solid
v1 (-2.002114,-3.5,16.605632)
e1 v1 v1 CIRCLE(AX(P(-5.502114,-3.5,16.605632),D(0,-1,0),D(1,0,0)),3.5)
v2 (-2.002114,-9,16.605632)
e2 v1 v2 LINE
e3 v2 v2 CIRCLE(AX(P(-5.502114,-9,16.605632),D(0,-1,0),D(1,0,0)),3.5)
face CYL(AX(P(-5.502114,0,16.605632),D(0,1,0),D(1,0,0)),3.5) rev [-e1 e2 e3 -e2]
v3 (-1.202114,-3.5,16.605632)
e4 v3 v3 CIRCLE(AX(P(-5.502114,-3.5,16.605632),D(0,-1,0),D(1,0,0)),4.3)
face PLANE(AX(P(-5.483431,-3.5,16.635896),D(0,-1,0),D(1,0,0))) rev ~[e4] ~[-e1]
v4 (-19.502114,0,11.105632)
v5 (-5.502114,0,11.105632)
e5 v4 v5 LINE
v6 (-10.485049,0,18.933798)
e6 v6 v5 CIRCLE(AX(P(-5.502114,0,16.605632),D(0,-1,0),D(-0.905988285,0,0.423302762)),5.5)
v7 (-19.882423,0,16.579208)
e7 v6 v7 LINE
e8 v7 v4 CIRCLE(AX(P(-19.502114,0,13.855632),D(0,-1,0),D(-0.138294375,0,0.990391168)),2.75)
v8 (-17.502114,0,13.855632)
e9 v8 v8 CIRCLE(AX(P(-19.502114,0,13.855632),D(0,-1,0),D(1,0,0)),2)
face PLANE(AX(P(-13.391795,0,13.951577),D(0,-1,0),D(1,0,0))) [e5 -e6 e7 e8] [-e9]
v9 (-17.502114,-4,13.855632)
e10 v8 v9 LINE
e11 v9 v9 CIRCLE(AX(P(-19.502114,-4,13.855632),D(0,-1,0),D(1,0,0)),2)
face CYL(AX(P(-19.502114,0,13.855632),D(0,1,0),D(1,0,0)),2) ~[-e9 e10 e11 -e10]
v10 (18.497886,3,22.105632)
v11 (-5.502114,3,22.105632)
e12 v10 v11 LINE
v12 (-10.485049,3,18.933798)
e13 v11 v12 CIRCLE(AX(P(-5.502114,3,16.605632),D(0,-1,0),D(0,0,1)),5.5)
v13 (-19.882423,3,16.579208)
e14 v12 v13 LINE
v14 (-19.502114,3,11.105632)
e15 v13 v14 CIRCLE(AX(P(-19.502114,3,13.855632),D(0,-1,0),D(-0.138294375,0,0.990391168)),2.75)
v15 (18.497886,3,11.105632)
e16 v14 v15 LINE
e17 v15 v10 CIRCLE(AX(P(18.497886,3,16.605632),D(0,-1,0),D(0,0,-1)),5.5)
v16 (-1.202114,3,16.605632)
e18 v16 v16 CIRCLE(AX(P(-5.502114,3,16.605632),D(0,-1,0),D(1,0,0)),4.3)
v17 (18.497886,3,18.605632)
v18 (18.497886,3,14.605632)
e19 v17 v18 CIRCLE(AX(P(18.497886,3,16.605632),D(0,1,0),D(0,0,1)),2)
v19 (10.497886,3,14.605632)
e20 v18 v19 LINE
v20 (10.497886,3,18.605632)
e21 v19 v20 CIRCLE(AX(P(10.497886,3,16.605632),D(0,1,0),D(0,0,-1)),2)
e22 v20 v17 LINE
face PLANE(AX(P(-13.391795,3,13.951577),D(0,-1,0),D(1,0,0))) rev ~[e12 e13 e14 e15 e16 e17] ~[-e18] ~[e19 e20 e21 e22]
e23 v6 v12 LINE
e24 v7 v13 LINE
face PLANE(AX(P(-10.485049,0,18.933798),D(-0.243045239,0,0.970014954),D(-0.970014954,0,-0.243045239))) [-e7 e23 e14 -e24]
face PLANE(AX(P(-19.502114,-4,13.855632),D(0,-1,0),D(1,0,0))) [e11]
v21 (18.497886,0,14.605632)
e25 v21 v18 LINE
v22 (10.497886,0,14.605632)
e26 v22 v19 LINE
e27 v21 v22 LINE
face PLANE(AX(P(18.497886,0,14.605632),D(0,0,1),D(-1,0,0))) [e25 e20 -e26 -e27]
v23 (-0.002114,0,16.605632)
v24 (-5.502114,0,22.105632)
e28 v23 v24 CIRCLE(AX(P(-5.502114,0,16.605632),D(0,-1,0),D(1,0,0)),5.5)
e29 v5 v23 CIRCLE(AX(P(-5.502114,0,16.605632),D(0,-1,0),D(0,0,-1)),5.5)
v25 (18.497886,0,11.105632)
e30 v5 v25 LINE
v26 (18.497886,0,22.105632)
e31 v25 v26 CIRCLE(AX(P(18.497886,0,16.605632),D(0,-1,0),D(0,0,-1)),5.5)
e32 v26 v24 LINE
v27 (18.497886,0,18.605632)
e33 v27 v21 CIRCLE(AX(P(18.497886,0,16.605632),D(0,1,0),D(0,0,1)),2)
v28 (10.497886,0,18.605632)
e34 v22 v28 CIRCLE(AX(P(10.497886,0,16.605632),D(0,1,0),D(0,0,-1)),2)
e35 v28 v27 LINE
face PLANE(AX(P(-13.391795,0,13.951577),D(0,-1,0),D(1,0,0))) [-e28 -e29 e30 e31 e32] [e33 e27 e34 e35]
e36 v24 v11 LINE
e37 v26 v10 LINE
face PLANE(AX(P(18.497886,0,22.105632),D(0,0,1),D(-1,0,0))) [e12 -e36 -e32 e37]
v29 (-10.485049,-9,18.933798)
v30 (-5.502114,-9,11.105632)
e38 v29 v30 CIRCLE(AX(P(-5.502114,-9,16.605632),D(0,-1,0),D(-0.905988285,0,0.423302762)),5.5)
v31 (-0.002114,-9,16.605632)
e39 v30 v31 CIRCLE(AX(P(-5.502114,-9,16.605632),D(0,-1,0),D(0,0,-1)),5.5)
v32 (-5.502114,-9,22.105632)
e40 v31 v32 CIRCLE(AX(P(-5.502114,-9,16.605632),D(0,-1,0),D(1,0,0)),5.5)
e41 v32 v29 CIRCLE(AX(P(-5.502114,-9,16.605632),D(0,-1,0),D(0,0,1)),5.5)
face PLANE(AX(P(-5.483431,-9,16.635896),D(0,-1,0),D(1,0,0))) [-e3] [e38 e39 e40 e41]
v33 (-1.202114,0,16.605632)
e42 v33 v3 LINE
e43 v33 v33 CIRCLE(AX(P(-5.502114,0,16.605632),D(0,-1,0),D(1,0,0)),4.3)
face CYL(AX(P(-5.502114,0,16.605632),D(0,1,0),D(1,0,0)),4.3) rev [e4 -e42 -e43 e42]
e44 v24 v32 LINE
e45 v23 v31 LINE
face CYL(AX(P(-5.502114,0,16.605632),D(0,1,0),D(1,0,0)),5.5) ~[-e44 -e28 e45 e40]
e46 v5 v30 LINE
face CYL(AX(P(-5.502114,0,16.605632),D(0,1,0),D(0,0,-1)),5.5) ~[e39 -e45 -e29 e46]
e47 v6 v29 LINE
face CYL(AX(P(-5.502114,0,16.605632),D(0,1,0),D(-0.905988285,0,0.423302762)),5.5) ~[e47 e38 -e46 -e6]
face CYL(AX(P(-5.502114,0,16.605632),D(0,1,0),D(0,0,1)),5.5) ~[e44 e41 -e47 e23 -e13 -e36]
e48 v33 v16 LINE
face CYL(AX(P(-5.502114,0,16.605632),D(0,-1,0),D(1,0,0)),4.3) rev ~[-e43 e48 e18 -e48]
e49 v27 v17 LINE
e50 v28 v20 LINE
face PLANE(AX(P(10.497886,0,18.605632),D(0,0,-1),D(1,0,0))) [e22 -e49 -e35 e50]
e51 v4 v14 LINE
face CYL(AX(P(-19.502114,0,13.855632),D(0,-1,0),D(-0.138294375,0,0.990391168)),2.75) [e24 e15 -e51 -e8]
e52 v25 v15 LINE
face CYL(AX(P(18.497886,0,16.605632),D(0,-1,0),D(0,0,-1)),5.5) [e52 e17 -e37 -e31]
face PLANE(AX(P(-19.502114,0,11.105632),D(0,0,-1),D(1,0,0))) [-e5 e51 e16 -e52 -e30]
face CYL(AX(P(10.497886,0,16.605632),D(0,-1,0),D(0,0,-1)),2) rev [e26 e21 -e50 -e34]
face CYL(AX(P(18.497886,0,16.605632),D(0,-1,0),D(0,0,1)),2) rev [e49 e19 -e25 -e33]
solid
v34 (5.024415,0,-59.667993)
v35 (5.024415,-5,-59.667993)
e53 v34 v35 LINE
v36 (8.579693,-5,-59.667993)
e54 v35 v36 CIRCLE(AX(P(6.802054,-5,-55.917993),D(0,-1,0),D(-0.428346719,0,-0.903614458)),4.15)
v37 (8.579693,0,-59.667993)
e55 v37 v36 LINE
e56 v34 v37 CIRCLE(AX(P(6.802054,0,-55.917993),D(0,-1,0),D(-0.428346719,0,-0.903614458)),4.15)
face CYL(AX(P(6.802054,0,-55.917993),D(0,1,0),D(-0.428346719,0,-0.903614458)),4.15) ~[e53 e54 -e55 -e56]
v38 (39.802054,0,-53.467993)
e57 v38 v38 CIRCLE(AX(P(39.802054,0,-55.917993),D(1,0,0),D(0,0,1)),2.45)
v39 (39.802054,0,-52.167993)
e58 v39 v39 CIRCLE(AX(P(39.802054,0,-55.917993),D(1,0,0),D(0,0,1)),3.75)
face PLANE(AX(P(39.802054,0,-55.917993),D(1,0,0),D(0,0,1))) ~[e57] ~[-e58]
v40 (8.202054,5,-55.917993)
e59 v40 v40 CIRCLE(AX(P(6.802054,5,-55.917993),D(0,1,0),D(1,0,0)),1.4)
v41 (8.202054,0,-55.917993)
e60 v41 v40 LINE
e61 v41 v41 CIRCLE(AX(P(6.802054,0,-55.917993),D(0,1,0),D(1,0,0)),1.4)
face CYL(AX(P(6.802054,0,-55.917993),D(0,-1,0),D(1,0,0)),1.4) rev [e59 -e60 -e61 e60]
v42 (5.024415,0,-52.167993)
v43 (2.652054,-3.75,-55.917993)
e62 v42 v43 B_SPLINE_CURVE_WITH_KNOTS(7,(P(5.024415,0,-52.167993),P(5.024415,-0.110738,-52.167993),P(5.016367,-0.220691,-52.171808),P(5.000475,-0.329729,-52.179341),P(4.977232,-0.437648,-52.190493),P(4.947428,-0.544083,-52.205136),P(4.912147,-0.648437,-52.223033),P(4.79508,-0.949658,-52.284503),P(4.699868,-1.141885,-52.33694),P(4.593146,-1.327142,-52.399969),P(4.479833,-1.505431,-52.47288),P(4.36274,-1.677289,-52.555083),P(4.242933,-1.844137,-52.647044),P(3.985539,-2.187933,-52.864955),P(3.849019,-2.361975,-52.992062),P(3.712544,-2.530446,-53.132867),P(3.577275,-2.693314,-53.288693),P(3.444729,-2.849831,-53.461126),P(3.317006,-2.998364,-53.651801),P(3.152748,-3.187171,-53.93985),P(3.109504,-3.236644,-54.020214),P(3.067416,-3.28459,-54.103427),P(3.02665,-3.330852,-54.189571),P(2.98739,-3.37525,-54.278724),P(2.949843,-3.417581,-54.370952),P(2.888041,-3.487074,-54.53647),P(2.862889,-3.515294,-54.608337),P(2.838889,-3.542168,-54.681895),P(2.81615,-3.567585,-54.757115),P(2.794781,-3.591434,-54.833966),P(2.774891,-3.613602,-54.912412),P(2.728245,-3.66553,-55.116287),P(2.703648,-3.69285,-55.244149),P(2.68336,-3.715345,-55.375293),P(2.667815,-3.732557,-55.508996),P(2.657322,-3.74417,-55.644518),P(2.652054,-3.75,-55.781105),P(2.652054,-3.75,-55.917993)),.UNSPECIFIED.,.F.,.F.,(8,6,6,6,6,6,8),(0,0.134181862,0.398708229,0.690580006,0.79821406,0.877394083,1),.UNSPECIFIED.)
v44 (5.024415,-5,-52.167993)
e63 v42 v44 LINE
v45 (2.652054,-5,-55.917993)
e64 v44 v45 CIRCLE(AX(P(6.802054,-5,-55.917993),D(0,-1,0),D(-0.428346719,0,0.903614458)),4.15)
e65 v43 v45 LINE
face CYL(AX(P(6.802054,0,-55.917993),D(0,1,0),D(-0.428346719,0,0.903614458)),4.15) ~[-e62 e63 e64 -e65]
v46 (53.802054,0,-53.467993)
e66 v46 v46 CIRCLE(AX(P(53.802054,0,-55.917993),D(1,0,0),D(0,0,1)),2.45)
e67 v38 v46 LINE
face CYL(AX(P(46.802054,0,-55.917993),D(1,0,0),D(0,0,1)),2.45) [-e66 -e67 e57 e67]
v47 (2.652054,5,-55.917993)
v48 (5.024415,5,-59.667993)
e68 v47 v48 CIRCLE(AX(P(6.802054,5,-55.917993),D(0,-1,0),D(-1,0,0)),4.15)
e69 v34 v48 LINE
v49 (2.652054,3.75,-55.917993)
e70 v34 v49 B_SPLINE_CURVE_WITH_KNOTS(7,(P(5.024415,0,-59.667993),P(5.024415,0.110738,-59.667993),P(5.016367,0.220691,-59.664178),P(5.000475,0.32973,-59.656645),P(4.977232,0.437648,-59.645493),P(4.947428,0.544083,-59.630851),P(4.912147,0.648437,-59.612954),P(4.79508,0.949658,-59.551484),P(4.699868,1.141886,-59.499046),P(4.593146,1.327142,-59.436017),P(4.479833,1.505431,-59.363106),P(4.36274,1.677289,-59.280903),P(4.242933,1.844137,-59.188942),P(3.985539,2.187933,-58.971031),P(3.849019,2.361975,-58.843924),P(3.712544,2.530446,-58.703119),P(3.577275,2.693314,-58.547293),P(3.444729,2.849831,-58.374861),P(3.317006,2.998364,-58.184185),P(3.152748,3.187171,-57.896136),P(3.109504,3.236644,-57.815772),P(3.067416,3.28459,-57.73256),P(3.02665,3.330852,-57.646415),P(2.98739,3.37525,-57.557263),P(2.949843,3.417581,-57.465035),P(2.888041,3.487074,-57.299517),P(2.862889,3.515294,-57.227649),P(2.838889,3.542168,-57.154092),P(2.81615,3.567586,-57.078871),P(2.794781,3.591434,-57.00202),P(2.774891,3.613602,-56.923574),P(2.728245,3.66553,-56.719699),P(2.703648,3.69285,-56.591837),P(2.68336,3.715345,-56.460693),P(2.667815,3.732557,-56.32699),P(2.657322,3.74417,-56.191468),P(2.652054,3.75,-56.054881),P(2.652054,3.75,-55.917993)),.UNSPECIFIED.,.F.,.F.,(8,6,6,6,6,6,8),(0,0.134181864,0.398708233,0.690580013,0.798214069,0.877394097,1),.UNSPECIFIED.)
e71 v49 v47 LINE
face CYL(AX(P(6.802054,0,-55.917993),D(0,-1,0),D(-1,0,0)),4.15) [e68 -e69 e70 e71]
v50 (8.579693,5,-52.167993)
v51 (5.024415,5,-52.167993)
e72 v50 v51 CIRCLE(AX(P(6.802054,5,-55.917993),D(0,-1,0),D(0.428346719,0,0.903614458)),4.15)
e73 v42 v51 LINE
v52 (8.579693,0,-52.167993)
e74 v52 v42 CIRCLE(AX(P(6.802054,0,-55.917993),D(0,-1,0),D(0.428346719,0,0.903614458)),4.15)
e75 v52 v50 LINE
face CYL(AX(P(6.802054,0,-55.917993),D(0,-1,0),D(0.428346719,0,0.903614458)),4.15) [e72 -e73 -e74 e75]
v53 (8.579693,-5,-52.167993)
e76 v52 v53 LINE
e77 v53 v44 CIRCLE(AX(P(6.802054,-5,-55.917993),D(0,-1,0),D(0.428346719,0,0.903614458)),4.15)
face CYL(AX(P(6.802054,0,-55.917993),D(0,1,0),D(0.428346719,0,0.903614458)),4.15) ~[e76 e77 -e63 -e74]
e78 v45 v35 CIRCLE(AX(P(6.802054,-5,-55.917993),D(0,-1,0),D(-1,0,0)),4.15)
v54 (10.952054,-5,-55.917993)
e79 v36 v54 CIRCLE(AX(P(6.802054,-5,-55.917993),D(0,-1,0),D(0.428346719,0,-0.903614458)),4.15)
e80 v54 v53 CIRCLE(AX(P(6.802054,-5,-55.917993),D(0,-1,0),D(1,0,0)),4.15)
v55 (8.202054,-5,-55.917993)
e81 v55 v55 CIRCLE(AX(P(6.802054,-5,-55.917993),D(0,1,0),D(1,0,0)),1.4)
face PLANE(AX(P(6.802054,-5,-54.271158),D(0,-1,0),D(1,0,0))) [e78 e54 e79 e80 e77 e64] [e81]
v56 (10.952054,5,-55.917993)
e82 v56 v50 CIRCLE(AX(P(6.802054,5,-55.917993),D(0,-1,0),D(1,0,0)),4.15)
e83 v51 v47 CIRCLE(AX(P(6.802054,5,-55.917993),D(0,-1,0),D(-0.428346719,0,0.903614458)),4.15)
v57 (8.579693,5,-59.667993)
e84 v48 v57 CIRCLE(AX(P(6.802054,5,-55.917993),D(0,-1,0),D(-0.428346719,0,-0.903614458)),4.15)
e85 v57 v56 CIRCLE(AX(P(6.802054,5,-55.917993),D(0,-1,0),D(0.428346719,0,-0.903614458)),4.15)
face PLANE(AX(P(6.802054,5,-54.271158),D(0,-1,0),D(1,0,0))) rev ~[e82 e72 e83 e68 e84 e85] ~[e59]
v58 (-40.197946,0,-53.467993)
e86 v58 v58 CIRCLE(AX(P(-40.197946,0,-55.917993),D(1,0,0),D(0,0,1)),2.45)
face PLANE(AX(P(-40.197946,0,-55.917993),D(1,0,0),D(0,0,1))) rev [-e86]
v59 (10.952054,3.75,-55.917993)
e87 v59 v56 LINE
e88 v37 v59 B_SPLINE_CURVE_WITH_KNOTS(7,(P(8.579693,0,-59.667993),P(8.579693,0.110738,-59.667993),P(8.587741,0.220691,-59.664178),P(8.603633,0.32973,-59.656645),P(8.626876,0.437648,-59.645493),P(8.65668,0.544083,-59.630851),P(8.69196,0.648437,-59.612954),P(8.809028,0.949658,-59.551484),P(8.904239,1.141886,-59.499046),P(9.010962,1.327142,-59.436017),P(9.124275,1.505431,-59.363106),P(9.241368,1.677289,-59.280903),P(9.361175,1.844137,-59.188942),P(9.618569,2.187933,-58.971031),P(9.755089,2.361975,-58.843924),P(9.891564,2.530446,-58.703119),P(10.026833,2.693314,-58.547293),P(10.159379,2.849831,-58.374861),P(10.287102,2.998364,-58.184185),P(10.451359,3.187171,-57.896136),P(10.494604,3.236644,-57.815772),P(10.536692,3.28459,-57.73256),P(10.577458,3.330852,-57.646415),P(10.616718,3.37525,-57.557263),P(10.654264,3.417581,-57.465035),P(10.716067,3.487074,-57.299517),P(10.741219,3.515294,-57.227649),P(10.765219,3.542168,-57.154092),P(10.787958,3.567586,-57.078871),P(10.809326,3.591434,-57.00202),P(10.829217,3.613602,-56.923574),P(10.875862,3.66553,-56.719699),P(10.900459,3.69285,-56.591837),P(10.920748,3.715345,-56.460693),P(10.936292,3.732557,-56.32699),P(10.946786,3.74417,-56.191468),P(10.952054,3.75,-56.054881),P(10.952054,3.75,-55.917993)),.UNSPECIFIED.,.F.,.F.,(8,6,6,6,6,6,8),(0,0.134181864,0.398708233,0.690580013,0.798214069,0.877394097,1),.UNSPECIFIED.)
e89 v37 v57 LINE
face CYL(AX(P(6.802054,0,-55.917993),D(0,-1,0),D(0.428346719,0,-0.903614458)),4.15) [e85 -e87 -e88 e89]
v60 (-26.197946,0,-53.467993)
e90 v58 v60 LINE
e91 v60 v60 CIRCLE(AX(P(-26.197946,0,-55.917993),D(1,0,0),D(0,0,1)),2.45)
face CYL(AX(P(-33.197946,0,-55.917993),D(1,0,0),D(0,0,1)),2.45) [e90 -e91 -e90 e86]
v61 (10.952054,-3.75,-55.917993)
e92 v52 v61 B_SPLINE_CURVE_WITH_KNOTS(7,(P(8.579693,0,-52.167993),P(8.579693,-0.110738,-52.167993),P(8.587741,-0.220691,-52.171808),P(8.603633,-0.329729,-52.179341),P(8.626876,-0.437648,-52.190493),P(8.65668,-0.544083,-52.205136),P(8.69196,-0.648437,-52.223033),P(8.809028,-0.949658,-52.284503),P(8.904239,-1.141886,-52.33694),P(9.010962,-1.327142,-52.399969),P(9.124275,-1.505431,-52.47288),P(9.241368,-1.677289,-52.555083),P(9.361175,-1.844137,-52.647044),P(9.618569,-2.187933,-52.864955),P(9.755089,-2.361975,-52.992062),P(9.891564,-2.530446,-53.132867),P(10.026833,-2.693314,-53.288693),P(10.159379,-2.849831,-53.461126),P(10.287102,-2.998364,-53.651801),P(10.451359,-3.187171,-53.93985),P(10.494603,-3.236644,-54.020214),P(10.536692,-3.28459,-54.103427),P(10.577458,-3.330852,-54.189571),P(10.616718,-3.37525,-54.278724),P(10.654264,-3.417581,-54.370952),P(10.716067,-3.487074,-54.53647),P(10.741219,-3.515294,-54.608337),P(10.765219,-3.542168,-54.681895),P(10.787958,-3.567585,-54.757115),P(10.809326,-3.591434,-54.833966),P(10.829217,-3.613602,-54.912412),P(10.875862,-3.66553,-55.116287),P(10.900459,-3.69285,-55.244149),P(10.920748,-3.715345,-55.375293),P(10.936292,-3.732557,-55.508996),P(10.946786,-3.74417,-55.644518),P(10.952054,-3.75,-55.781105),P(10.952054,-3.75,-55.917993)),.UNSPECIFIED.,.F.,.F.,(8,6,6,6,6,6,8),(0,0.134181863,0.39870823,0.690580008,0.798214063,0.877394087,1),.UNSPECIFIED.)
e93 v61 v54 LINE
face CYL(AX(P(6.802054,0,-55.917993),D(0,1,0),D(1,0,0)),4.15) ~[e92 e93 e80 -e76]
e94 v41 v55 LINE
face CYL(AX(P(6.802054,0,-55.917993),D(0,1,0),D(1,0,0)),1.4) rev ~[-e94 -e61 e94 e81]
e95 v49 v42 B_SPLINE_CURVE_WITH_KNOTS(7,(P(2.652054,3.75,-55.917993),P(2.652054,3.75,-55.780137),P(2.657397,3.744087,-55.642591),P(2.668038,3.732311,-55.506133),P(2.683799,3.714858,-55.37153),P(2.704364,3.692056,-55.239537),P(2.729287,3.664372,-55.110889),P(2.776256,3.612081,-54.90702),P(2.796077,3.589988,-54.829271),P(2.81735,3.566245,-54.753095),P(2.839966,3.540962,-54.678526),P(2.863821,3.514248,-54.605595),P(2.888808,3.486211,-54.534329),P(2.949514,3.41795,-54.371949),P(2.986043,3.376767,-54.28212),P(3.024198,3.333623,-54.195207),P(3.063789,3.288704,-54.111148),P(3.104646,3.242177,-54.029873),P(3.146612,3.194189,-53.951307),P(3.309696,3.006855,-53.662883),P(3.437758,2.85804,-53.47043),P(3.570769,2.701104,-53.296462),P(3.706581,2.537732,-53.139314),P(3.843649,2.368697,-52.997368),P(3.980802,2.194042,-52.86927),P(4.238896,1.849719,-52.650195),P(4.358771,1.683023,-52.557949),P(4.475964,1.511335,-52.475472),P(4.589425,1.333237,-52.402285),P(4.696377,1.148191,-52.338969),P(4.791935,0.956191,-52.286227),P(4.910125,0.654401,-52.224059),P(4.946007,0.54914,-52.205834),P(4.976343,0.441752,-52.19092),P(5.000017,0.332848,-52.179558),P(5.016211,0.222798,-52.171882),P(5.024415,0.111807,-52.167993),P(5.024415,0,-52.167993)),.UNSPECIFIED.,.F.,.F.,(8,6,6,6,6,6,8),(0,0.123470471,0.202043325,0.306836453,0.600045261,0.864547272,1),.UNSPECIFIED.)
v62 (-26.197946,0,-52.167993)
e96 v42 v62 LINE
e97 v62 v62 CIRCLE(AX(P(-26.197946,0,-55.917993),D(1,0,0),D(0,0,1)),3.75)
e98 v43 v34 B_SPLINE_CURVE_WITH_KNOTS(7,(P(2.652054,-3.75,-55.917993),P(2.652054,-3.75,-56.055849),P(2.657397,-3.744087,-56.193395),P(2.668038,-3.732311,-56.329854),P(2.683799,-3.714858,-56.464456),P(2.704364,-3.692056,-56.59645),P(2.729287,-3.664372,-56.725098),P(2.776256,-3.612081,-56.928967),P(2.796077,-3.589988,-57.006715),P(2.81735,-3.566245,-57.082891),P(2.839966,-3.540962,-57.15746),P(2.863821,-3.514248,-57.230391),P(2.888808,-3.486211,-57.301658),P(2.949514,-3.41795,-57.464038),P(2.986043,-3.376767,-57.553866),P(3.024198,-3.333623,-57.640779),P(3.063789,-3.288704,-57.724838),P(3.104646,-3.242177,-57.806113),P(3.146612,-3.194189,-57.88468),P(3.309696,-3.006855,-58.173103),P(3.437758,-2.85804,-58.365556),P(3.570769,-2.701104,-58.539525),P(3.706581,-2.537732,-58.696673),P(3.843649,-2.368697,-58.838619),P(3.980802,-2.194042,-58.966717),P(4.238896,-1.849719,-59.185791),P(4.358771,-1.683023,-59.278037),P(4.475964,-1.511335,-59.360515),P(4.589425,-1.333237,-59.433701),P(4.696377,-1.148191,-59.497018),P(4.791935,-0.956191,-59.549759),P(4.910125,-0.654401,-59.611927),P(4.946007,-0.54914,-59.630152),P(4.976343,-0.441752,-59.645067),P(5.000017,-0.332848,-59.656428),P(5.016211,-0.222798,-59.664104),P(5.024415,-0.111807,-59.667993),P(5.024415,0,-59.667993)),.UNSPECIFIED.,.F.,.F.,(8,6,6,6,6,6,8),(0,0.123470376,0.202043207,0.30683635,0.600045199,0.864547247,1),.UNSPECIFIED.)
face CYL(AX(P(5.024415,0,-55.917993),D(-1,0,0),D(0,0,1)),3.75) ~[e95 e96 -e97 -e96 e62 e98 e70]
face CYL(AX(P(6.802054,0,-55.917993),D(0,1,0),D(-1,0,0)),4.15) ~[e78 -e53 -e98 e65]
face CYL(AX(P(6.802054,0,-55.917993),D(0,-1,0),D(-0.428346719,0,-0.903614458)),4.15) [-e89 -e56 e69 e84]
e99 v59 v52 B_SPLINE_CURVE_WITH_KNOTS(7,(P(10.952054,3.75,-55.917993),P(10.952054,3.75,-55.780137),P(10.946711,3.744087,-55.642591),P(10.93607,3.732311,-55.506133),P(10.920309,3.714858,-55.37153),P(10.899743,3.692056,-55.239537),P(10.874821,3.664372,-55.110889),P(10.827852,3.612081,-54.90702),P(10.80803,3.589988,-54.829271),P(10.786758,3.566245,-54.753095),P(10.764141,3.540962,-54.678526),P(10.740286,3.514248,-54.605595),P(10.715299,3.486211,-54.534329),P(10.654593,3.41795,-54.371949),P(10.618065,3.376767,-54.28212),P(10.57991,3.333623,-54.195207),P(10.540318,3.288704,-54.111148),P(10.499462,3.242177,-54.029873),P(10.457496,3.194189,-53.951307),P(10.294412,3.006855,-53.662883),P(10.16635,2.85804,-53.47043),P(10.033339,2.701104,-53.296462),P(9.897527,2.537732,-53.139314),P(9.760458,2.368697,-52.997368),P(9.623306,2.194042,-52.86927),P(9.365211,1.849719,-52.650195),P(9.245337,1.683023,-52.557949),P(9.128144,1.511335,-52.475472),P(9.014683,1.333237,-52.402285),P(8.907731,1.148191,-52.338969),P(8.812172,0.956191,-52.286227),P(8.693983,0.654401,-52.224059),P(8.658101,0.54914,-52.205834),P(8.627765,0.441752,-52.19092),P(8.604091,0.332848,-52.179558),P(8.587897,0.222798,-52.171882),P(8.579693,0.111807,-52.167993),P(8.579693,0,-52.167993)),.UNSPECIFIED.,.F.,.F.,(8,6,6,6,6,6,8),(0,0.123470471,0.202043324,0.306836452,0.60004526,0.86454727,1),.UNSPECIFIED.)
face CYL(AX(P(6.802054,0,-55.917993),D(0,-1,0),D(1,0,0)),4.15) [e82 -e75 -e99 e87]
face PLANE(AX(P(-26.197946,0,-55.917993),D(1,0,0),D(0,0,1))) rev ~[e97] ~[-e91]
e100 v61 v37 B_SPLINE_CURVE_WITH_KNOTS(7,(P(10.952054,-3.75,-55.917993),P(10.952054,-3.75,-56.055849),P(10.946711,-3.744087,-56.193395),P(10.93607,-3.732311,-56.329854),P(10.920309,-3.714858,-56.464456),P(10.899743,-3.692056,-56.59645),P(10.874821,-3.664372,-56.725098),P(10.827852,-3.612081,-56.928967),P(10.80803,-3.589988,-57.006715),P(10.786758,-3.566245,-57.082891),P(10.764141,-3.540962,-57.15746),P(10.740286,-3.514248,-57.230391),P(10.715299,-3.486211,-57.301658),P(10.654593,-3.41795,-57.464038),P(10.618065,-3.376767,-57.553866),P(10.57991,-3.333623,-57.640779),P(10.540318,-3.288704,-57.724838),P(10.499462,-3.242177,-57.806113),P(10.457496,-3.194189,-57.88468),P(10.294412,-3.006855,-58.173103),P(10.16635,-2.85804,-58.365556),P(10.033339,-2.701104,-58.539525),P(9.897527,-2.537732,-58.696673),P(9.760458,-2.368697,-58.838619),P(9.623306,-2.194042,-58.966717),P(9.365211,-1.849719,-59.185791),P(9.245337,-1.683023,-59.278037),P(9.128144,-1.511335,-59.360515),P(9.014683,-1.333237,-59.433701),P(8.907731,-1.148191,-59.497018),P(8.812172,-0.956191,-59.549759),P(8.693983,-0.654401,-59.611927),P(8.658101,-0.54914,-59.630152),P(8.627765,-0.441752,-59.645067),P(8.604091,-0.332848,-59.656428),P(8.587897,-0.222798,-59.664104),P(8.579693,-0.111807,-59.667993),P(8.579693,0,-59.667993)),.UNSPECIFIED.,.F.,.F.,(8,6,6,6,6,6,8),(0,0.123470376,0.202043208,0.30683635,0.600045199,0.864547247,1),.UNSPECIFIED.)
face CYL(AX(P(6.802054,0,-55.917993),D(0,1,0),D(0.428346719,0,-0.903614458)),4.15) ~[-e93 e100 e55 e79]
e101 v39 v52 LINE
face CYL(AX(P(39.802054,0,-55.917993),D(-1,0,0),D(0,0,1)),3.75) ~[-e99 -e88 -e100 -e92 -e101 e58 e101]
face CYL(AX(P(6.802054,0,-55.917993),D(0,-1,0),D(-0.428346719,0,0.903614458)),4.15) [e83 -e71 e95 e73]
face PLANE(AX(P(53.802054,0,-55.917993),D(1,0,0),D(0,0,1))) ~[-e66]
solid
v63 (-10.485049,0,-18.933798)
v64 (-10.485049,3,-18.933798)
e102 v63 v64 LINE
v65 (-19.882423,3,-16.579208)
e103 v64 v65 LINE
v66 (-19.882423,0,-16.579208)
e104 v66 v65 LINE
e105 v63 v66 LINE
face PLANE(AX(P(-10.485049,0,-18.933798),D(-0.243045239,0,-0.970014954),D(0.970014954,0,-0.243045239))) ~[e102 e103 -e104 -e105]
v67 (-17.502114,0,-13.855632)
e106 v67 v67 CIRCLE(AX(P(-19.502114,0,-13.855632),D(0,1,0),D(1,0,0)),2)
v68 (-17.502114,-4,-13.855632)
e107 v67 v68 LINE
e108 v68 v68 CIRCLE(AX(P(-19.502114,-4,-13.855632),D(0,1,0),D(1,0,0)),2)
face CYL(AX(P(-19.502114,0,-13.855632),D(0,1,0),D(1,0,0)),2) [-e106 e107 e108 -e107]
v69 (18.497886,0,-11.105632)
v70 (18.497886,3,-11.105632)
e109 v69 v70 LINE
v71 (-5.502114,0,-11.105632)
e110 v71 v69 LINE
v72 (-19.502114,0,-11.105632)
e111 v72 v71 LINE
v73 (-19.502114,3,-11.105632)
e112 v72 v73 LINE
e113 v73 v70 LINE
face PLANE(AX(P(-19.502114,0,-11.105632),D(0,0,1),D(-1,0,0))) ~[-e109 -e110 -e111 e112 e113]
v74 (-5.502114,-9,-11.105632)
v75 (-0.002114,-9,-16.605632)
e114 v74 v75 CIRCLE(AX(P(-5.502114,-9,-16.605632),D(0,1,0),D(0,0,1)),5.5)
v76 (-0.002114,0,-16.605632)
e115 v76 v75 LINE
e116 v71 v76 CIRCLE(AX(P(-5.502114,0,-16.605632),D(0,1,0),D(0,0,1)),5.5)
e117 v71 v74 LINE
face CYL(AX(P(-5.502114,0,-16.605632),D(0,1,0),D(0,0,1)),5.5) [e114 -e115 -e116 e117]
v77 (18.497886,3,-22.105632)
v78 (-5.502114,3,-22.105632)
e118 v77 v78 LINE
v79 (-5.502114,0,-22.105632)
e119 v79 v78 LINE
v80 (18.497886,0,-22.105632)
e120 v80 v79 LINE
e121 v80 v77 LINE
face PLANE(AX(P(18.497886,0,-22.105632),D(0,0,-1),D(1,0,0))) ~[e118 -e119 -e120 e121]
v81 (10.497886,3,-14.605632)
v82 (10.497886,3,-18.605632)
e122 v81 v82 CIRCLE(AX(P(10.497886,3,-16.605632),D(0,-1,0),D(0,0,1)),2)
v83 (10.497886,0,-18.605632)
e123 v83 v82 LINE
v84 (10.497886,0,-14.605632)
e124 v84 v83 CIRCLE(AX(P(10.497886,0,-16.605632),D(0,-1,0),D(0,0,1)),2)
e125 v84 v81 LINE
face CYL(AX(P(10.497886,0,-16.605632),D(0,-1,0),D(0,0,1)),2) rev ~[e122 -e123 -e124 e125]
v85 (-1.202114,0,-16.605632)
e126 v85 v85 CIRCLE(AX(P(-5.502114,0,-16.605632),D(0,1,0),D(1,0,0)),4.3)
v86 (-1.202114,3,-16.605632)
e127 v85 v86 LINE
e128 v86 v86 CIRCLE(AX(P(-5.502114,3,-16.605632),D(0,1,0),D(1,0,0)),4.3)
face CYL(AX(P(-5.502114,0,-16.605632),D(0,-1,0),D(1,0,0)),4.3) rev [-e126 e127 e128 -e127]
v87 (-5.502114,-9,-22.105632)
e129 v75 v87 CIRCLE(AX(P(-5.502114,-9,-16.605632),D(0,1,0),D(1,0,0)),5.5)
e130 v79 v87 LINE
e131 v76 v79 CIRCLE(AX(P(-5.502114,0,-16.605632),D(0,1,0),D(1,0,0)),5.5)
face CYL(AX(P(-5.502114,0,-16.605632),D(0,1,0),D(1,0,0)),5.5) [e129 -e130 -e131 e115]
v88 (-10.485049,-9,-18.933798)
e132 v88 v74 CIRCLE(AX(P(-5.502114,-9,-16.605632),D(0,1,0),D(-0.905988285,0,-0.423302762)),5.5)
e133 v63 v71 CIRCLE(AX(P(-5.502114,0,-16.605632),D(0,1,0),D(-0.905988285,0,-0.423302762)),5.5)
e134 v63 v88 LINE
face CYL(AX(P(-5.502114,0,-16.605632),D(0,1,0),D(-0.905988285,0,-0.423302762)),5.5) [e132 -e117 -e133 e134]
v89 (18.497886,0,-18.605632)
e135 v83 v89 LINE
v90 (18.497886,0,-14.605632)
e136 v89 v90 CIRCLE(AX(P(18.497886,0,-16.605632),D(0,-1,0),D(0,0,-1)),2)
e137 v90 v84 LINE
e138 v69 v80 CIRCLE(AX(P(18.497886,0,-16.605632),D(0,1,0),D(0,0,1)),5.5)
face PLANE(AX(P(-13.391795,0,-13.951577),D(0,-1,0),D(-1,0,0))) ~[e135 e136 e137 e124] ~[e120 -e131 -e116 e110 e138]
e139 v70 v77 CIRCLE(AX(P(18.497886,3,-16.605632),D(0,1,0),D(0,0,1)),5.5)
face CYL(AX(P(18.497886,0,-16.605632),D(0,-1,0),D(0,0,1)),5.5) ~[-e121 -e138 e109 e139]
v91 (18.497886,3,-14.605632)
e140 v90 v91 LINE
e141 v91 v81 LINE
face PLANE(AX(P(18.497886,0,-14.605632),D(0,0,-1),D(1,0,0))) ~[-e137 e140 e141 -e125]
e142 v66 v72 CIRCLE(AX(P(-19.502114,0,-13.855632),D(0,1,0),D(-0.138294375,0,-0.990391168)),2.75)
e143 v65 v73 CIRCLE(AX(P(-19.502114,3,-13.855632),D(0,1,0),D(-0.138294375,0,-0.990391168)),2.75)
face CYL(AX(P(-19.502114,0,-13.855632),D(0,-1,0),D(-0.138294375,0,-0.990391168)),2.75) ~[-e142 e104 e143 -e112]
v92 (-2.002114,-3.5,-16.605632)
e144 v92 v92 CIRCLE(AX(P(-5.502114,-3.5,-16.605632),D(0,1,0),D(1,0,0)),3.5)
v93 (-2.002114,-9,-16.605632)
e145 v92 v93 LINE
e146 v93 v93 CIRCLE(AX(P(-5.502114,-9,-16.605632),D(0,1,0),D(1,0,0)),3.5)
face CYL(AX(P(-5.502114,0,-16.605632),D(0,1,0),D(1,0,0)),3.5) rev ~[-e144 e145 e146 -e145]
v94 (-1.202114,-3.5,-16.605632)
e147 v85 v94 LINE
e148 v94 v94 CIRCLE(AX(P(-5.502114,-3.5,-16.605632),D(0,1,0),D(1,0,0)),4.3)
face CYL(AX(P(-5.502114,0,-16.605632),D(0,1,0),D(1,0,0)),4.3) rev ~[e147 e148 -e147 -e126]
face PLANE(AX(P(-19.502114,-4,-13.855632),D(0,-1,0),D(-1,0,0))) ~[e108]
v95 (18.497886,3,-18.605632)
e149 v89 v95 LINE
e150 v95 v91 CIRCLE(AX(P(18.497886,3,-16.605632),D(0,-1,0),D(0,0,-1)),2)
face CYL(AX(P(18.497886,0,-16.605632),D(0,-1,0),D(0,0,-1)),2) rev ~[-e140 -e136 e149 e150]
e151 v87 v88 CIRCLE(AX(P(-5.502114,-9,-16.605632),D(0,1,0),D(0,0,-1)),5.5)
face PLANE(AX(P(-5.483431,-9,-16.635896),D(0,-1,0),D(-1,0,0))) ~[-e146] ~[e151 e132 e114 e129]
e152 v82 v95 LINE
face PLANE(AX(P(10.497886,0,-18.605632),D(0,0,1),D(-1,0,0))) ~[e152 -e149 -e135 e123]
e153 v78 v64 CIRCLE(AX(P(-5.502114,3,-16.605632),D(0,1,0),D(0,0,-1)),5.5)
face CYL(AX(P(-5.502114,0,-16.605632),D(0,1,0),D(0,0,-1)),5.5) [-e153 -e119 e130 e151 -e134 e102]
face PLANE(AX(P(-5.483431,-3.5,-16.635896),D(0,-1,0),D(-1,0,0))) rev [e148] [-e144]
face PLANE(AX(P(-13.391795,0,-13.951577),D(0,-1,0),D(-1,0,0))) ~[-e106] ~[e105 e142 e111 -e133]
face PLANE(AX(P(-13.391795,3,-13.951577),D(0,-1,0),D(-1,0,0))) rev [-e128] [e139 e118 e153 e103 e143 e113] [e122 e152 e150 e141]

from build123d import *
from build123d import SkipClean  # not in build123d's __all__

# Parameters (mm, degrees)
F0_R     = 4.3
F0_R_2   = 2
F1_DEPTH = 3
F2_DEPTH = 4
F0_R_3   = 3.5
F3_DEPTH = 9
F4_DEPTH = 3.5
F7_DEPTH = 5
F8_DEPTH = 5
F6_W     = 14
F6_H     = 2.45


# Not quite as in the source:
# - after a boolean that leaves OpenCascade's solid faulty, fix() repairs it


with BuildPart() as f1:
    # F0 (on Front) → F1 (new body)
    with BuildSketch(Plane.XZ):
        with BuildLine():
            ThreePointArc((-5.5021138936, 11.1056324095), (-10.1418826672, 13.6522367828), (-10.4850494589, 18.9337975995))
            Line((-10.4850494589, 18.9337975995), (-19.8824234241, 16.5792081218))
            ThreePointArc((-19.8824234241, 16.5792081218), (-17.6970309604, 15.9302831281), (-16.7521138936, 13.8556324095))
            ThreePointArc((-16.7521138936, 13.8556324095), (-17.5575702454, 11.9110887612), (-19.5021138936, 11.1056324095))
            Line((-19.5021138936, 11.1056324095), (-5.5021138936, 11.1056324095))
        make_face()
        with BuildLine():
            ThreePointArc((-0.0021138936, 16.6056324095), (-1.6130265971, 20.494719706), (-5.5021138936, 22.1056324095))
            ThreePointArc((-5.5021138936, 22.1056324095), (-8.4555095203, 21.2454011831), (-10.4850494589, 18.9337975995))
            ThreePointArc((-10.4850494589, 18.9337975995), (-10.1418826672, 13.6522367828), (-5.5021138936, 11.1056324095))
            ThreePointArc((-5.5021138936, 11.1056324095), (-1.6130265971, 12.7165451129), (-0.0021138936, 16.6056324095))
        make_face()
        with Locations((-5.5021138936, 16.6056324095)):
            Circle(F0_R, mode=Mode.SUBTRACT)
        with BuildLine():
            Line((18.4978861064, 22.1056324095), (-5.5021138936, 22.1056324095))
            ThreePointArc((-5.5021138936, 22.1056324095), (-1.6130265971, 20.494719706), (-0.0021138936, 16.6056324095))
            ThreePointArc((-0.0021138936, 16.6056324095), (-1.6130265971, 12.7165451129), (-5.5021138936, 11.1056324095))
            Line((-5.5021138936, 11.1056324095), (18.4978861064, 11.1056324095))
            ThreePointArc((18.4978861064, 11.1056324095), (23.9978861064, 16.6056324095), (18.4978861064, 22.1056324095))
        make_face()
        with BuildLine():
            ThreePointArc((18.4978861064, 18.6056324095), (20.4978861064, 16.6056324095), (18.4978861064, 14.6056324095))
            Line((18.4978861064, 14.6056324095), (10.4978861064, 14.6056324095))
            ThreePointArc((10.4978861064, 14.6056324095), (8.4978861064, 16.6056324095), (10.4978861064, 18.6056324095))
            Line((10.4978861064, 18.6056324095), (18.4978861064, 18.6056324095))
        make_face(mode=Mode.SUBTRACT)
        with BuildLine():
            ThreePointArc((-16.7521138936, 13.8556324095), (-17.6970309604, 15.9302831281), (-19.8824234241, 16.5792081218))
            ThreePointArc((-19.8824234241, 16.5792081218), (-22.245499868, 13.6650192004), (-19.5021138936, 11.1056324095))
            ThreePointArc((-19.5021138936, 11.1056324095), (-17.5575702454, 11.9110887612), (-16.7521138936, 13.8556324095))
        make_face()
        with Locations((-19.5021138936, 13.8556324095)):
            Circle(F0_R_2, mode=Mode.SUBTRACT)
        with Locations((-19.5021138936, 13.8556324095)):
            Circle(F0_R_2)
    extrude(amount=-F1_DEPTH)

    # F0 (on Front) → F2 (join)
    with BuildSketch(Plane.XZ):
        with Locations((-19.5021138936, 13.8556324095)):
            Circle(F0_R_2)
    extrude(amount=F2_DEPTH)

    # F0 (on Front) → F3 (join)
    with BuildSketch(Plane.XZ):
        with BuildLine():
            ThreePointArc((-0.0021138936, 16.6056324095), (-1.6130265971, 20.494719706), (-5.5021138936, 22.1056324095))
            ThreePointArc((-5.5021138936, 22.1056324095), (-8.4555095203, 21.2454011831), (-10.4850494589, 18.9337975995))
            ThreePointArc((-10.4850494589, 18.9337975995), (-10.1418826672, 13.6522367828), (-5.5021138936, 11.1056324095))
            ThreePointArc((-5.5021138936, 11.1056324095), (-1.6130265971, 12.7165451129), (-0.0021138936, 16.6056324095))
        make_face()
        with Locations((-5.5021138936, 16.6056324095)):
            Circle(F0_R, mode=Mode.SUBTRACT)
        with Locations((-5.5021138936, 16.6056324095)):
            Circle(F0_R)
        with Locations((-5.5021138936, 16.6056324095)):
            Circle(F0_R_3, mode=Mode.SUBTRACT)
    with SkipClean():  # cleaning this boolean's faces spoils the solid; the shape is the same uncleaned
        extrude(amount=F3_DEPTH)

    # F4 (cut): a face of the model
    f4_faces = [f1.faces().sort_by_distance(p)[0] for p in [
        (-9.6804915273, 0, 16.6056324095),
    ]]
    extrude(f4_faces, amount=-F4_DEPTH, mode=Mode.SUBTRACT)

    add(f1.part.fix(), mode=Mode.REPLACE)


with BuildPart() as f5_1:
    # F5: instance of F1
    add(f1.part.mirror(Plane.XY), clean=False)


with BuildPart() as f7:
    # F6 (on Front) → F7 (new body)
    with BuildSketch(Plane.XZ):
        with BuildLine():
            Line((8.2020538688, -55.9179931879), (10.9520538688, -55.9179931879))
            ThreePointArc((10.9520538688, -55.9179931879), (10.3091681645, -53.6992887649), (8.5796927522, -52.1679931879))
            ThreePointArc((8.5796927522, -52.1679931879), (6.8020538688, -51.7679931879), (5.0244149853, -52.1679931879))
            ThreePointArc((5.0244149853, -52.1679931879), (3.2949395731, -53.6992887649), (2.6520538688, -55.9179931879))
            Line((2.6520538688, -55.9179931879), (5.4020538688, -55.9179931879))
            ThreePointArc((5.4020538688, -55.9179931879), (6.8020538688, -54.5179931879), (8.2020538688, -55.9179931879))
        make_face()
        with BuildLine():
            ThreePointArc((8.5796927522, -59.6679931879), (10.3091681645, -58.1366976109), (10.9520538688, -55.9179931879))
            Line((10.9520538688, -55.9179931879), (8.2020538688, -55.9179931879))
            ThreePointArc((8.2020538688, -55.9179931879), (6.8020538688, -57.3179931879), (5.4020538688, -55.9179931879))
            Line((5.4020538688, -55.9179931879), (2.6520538688, -55.9179931879))
            ThreePointArc((2.6520538688, -55.9179931879), (3.2949395731, -58.1366976109), (5.0244149853, -59.6679931879))
            ThreePointArc((5.0244149853, -59.6679931879), (6.8020538688, -60.0679931879), (8.5796927522, -59.6679931879))
        make_face()
    extrude(amount=F7_DEPTH)

    # F6 (on Front) → F8 (join)
    with BuildSketch(Plane.XZ):
        with BuildLine():
            Line((8.2020538688, -55.9179931879), (10.9520538688, -55.9179931879))
            ThreePointArc((10.9520538688, -55.9179931879), (10.3091681645, -53.6992887649), (8.5796927522, -52.1679931879))
            ThreePointArc((8.5796927522, -52.1679931879), (6.8020538688, -51.7679931879), (5.0244149853, -52.1679931879))
            ThreePointArc((5.0244149853, -52.1679931879), (3.2949395731, -53.6992887649), (2.6520538688, -55.9179931879))
            Line((2.6520538688, -55.9179931879), (5.4020538688, -55.9179931879))
            ThreePointArc((5.4020538688, -55.9179931879), (6.8020538688, -54.5179931879), (8.2020538688, -55.9179931879))
        make_face()
        with BuildLine():
            ThreePointArc((8.5796927522, -59.6679931879), (10.3091681645, -58.1366976109), (10.9520538688, -55.9179931879))
            Line((10.9520538688, -55.9179931879), (8.2020538688, -55.9179931879))
            ThreePointArc((8.2020538688, -55.9179931879), (6.8020538688, -57.3179931879), (5.4020538688, -55.9179931879))
            Line((5.4020538688, -55.9179931879), (2.6520538688, -55.9179931879))
            ThreePointArc((2.6520538688, -55.9179931879), (3.2949395731, -58.1366976109), (5.0244149853, -59.6679931879))
            ThreePointArc((5.0244149853, -59.6679931879), (6.8020538688, -60.0679931879), (8.5796927522, -59.6679931879))
        make_face()
    extrude(amount=-F8_DEPTH)

    # F6 (on Front) → F9 (revolve)
    with BuildSketch(Plane.XZ):
        with BuildLine():
            ThreePointArc((2.6520538688, -55.9179931879), (3.2949395731, -53.6992887649), (5.0244149853, -52.1679931879))
            Line((5.0244149853, -52.1679931879), (-26.1979461312, -52.1679931879))
            Line((-26.1979461312, -52.1679931879), (-26.1979461312, -53.4679931879))
            Line((-26.1979461312, -53.4679931879), (-26.1979461312, -55.9179931879))
            Line((-26.1979461312, -55.9179931879), (2.6520538688, -55.9179931879))
        make_face()
        with Locations((-33.1979461312, -54.6929931879)):
            Rectangle(F6_W, F6_H)
        with BuildLine():
            ThreePointArc((8.5796927522, -52.1679931879), (10.3091681645, -53.6992887649), (10.9520538688, -55.9179931879))
            Line((10.9520538688, -55.9179931879), (39.8020538688, -55.9179931879))
            Line((39.8020538688, -55.9179931879), (39.8020538688, -53.4679931879))
            Line((39.8020538688, -53.4679931879), (39.8020538688, -52.1679931879))
            Line((39.8020538688, -52.1679931879), (8.5796927522, -52.1679931879))
        make_face()
        with Locations((46.8020538688, -54.6929931879)):
            Rectangle(F6_W, F6_H)
    with SkipClean():  # cleaning this boolean's faces spoils the solid; the shape is the same uncleaned
        revolve(axis=Axis((6.8020538688, 0, -55.9179931879), (1, 0, 0)))


solid = Compound([f1.part, f5_1.part, f7.part])
